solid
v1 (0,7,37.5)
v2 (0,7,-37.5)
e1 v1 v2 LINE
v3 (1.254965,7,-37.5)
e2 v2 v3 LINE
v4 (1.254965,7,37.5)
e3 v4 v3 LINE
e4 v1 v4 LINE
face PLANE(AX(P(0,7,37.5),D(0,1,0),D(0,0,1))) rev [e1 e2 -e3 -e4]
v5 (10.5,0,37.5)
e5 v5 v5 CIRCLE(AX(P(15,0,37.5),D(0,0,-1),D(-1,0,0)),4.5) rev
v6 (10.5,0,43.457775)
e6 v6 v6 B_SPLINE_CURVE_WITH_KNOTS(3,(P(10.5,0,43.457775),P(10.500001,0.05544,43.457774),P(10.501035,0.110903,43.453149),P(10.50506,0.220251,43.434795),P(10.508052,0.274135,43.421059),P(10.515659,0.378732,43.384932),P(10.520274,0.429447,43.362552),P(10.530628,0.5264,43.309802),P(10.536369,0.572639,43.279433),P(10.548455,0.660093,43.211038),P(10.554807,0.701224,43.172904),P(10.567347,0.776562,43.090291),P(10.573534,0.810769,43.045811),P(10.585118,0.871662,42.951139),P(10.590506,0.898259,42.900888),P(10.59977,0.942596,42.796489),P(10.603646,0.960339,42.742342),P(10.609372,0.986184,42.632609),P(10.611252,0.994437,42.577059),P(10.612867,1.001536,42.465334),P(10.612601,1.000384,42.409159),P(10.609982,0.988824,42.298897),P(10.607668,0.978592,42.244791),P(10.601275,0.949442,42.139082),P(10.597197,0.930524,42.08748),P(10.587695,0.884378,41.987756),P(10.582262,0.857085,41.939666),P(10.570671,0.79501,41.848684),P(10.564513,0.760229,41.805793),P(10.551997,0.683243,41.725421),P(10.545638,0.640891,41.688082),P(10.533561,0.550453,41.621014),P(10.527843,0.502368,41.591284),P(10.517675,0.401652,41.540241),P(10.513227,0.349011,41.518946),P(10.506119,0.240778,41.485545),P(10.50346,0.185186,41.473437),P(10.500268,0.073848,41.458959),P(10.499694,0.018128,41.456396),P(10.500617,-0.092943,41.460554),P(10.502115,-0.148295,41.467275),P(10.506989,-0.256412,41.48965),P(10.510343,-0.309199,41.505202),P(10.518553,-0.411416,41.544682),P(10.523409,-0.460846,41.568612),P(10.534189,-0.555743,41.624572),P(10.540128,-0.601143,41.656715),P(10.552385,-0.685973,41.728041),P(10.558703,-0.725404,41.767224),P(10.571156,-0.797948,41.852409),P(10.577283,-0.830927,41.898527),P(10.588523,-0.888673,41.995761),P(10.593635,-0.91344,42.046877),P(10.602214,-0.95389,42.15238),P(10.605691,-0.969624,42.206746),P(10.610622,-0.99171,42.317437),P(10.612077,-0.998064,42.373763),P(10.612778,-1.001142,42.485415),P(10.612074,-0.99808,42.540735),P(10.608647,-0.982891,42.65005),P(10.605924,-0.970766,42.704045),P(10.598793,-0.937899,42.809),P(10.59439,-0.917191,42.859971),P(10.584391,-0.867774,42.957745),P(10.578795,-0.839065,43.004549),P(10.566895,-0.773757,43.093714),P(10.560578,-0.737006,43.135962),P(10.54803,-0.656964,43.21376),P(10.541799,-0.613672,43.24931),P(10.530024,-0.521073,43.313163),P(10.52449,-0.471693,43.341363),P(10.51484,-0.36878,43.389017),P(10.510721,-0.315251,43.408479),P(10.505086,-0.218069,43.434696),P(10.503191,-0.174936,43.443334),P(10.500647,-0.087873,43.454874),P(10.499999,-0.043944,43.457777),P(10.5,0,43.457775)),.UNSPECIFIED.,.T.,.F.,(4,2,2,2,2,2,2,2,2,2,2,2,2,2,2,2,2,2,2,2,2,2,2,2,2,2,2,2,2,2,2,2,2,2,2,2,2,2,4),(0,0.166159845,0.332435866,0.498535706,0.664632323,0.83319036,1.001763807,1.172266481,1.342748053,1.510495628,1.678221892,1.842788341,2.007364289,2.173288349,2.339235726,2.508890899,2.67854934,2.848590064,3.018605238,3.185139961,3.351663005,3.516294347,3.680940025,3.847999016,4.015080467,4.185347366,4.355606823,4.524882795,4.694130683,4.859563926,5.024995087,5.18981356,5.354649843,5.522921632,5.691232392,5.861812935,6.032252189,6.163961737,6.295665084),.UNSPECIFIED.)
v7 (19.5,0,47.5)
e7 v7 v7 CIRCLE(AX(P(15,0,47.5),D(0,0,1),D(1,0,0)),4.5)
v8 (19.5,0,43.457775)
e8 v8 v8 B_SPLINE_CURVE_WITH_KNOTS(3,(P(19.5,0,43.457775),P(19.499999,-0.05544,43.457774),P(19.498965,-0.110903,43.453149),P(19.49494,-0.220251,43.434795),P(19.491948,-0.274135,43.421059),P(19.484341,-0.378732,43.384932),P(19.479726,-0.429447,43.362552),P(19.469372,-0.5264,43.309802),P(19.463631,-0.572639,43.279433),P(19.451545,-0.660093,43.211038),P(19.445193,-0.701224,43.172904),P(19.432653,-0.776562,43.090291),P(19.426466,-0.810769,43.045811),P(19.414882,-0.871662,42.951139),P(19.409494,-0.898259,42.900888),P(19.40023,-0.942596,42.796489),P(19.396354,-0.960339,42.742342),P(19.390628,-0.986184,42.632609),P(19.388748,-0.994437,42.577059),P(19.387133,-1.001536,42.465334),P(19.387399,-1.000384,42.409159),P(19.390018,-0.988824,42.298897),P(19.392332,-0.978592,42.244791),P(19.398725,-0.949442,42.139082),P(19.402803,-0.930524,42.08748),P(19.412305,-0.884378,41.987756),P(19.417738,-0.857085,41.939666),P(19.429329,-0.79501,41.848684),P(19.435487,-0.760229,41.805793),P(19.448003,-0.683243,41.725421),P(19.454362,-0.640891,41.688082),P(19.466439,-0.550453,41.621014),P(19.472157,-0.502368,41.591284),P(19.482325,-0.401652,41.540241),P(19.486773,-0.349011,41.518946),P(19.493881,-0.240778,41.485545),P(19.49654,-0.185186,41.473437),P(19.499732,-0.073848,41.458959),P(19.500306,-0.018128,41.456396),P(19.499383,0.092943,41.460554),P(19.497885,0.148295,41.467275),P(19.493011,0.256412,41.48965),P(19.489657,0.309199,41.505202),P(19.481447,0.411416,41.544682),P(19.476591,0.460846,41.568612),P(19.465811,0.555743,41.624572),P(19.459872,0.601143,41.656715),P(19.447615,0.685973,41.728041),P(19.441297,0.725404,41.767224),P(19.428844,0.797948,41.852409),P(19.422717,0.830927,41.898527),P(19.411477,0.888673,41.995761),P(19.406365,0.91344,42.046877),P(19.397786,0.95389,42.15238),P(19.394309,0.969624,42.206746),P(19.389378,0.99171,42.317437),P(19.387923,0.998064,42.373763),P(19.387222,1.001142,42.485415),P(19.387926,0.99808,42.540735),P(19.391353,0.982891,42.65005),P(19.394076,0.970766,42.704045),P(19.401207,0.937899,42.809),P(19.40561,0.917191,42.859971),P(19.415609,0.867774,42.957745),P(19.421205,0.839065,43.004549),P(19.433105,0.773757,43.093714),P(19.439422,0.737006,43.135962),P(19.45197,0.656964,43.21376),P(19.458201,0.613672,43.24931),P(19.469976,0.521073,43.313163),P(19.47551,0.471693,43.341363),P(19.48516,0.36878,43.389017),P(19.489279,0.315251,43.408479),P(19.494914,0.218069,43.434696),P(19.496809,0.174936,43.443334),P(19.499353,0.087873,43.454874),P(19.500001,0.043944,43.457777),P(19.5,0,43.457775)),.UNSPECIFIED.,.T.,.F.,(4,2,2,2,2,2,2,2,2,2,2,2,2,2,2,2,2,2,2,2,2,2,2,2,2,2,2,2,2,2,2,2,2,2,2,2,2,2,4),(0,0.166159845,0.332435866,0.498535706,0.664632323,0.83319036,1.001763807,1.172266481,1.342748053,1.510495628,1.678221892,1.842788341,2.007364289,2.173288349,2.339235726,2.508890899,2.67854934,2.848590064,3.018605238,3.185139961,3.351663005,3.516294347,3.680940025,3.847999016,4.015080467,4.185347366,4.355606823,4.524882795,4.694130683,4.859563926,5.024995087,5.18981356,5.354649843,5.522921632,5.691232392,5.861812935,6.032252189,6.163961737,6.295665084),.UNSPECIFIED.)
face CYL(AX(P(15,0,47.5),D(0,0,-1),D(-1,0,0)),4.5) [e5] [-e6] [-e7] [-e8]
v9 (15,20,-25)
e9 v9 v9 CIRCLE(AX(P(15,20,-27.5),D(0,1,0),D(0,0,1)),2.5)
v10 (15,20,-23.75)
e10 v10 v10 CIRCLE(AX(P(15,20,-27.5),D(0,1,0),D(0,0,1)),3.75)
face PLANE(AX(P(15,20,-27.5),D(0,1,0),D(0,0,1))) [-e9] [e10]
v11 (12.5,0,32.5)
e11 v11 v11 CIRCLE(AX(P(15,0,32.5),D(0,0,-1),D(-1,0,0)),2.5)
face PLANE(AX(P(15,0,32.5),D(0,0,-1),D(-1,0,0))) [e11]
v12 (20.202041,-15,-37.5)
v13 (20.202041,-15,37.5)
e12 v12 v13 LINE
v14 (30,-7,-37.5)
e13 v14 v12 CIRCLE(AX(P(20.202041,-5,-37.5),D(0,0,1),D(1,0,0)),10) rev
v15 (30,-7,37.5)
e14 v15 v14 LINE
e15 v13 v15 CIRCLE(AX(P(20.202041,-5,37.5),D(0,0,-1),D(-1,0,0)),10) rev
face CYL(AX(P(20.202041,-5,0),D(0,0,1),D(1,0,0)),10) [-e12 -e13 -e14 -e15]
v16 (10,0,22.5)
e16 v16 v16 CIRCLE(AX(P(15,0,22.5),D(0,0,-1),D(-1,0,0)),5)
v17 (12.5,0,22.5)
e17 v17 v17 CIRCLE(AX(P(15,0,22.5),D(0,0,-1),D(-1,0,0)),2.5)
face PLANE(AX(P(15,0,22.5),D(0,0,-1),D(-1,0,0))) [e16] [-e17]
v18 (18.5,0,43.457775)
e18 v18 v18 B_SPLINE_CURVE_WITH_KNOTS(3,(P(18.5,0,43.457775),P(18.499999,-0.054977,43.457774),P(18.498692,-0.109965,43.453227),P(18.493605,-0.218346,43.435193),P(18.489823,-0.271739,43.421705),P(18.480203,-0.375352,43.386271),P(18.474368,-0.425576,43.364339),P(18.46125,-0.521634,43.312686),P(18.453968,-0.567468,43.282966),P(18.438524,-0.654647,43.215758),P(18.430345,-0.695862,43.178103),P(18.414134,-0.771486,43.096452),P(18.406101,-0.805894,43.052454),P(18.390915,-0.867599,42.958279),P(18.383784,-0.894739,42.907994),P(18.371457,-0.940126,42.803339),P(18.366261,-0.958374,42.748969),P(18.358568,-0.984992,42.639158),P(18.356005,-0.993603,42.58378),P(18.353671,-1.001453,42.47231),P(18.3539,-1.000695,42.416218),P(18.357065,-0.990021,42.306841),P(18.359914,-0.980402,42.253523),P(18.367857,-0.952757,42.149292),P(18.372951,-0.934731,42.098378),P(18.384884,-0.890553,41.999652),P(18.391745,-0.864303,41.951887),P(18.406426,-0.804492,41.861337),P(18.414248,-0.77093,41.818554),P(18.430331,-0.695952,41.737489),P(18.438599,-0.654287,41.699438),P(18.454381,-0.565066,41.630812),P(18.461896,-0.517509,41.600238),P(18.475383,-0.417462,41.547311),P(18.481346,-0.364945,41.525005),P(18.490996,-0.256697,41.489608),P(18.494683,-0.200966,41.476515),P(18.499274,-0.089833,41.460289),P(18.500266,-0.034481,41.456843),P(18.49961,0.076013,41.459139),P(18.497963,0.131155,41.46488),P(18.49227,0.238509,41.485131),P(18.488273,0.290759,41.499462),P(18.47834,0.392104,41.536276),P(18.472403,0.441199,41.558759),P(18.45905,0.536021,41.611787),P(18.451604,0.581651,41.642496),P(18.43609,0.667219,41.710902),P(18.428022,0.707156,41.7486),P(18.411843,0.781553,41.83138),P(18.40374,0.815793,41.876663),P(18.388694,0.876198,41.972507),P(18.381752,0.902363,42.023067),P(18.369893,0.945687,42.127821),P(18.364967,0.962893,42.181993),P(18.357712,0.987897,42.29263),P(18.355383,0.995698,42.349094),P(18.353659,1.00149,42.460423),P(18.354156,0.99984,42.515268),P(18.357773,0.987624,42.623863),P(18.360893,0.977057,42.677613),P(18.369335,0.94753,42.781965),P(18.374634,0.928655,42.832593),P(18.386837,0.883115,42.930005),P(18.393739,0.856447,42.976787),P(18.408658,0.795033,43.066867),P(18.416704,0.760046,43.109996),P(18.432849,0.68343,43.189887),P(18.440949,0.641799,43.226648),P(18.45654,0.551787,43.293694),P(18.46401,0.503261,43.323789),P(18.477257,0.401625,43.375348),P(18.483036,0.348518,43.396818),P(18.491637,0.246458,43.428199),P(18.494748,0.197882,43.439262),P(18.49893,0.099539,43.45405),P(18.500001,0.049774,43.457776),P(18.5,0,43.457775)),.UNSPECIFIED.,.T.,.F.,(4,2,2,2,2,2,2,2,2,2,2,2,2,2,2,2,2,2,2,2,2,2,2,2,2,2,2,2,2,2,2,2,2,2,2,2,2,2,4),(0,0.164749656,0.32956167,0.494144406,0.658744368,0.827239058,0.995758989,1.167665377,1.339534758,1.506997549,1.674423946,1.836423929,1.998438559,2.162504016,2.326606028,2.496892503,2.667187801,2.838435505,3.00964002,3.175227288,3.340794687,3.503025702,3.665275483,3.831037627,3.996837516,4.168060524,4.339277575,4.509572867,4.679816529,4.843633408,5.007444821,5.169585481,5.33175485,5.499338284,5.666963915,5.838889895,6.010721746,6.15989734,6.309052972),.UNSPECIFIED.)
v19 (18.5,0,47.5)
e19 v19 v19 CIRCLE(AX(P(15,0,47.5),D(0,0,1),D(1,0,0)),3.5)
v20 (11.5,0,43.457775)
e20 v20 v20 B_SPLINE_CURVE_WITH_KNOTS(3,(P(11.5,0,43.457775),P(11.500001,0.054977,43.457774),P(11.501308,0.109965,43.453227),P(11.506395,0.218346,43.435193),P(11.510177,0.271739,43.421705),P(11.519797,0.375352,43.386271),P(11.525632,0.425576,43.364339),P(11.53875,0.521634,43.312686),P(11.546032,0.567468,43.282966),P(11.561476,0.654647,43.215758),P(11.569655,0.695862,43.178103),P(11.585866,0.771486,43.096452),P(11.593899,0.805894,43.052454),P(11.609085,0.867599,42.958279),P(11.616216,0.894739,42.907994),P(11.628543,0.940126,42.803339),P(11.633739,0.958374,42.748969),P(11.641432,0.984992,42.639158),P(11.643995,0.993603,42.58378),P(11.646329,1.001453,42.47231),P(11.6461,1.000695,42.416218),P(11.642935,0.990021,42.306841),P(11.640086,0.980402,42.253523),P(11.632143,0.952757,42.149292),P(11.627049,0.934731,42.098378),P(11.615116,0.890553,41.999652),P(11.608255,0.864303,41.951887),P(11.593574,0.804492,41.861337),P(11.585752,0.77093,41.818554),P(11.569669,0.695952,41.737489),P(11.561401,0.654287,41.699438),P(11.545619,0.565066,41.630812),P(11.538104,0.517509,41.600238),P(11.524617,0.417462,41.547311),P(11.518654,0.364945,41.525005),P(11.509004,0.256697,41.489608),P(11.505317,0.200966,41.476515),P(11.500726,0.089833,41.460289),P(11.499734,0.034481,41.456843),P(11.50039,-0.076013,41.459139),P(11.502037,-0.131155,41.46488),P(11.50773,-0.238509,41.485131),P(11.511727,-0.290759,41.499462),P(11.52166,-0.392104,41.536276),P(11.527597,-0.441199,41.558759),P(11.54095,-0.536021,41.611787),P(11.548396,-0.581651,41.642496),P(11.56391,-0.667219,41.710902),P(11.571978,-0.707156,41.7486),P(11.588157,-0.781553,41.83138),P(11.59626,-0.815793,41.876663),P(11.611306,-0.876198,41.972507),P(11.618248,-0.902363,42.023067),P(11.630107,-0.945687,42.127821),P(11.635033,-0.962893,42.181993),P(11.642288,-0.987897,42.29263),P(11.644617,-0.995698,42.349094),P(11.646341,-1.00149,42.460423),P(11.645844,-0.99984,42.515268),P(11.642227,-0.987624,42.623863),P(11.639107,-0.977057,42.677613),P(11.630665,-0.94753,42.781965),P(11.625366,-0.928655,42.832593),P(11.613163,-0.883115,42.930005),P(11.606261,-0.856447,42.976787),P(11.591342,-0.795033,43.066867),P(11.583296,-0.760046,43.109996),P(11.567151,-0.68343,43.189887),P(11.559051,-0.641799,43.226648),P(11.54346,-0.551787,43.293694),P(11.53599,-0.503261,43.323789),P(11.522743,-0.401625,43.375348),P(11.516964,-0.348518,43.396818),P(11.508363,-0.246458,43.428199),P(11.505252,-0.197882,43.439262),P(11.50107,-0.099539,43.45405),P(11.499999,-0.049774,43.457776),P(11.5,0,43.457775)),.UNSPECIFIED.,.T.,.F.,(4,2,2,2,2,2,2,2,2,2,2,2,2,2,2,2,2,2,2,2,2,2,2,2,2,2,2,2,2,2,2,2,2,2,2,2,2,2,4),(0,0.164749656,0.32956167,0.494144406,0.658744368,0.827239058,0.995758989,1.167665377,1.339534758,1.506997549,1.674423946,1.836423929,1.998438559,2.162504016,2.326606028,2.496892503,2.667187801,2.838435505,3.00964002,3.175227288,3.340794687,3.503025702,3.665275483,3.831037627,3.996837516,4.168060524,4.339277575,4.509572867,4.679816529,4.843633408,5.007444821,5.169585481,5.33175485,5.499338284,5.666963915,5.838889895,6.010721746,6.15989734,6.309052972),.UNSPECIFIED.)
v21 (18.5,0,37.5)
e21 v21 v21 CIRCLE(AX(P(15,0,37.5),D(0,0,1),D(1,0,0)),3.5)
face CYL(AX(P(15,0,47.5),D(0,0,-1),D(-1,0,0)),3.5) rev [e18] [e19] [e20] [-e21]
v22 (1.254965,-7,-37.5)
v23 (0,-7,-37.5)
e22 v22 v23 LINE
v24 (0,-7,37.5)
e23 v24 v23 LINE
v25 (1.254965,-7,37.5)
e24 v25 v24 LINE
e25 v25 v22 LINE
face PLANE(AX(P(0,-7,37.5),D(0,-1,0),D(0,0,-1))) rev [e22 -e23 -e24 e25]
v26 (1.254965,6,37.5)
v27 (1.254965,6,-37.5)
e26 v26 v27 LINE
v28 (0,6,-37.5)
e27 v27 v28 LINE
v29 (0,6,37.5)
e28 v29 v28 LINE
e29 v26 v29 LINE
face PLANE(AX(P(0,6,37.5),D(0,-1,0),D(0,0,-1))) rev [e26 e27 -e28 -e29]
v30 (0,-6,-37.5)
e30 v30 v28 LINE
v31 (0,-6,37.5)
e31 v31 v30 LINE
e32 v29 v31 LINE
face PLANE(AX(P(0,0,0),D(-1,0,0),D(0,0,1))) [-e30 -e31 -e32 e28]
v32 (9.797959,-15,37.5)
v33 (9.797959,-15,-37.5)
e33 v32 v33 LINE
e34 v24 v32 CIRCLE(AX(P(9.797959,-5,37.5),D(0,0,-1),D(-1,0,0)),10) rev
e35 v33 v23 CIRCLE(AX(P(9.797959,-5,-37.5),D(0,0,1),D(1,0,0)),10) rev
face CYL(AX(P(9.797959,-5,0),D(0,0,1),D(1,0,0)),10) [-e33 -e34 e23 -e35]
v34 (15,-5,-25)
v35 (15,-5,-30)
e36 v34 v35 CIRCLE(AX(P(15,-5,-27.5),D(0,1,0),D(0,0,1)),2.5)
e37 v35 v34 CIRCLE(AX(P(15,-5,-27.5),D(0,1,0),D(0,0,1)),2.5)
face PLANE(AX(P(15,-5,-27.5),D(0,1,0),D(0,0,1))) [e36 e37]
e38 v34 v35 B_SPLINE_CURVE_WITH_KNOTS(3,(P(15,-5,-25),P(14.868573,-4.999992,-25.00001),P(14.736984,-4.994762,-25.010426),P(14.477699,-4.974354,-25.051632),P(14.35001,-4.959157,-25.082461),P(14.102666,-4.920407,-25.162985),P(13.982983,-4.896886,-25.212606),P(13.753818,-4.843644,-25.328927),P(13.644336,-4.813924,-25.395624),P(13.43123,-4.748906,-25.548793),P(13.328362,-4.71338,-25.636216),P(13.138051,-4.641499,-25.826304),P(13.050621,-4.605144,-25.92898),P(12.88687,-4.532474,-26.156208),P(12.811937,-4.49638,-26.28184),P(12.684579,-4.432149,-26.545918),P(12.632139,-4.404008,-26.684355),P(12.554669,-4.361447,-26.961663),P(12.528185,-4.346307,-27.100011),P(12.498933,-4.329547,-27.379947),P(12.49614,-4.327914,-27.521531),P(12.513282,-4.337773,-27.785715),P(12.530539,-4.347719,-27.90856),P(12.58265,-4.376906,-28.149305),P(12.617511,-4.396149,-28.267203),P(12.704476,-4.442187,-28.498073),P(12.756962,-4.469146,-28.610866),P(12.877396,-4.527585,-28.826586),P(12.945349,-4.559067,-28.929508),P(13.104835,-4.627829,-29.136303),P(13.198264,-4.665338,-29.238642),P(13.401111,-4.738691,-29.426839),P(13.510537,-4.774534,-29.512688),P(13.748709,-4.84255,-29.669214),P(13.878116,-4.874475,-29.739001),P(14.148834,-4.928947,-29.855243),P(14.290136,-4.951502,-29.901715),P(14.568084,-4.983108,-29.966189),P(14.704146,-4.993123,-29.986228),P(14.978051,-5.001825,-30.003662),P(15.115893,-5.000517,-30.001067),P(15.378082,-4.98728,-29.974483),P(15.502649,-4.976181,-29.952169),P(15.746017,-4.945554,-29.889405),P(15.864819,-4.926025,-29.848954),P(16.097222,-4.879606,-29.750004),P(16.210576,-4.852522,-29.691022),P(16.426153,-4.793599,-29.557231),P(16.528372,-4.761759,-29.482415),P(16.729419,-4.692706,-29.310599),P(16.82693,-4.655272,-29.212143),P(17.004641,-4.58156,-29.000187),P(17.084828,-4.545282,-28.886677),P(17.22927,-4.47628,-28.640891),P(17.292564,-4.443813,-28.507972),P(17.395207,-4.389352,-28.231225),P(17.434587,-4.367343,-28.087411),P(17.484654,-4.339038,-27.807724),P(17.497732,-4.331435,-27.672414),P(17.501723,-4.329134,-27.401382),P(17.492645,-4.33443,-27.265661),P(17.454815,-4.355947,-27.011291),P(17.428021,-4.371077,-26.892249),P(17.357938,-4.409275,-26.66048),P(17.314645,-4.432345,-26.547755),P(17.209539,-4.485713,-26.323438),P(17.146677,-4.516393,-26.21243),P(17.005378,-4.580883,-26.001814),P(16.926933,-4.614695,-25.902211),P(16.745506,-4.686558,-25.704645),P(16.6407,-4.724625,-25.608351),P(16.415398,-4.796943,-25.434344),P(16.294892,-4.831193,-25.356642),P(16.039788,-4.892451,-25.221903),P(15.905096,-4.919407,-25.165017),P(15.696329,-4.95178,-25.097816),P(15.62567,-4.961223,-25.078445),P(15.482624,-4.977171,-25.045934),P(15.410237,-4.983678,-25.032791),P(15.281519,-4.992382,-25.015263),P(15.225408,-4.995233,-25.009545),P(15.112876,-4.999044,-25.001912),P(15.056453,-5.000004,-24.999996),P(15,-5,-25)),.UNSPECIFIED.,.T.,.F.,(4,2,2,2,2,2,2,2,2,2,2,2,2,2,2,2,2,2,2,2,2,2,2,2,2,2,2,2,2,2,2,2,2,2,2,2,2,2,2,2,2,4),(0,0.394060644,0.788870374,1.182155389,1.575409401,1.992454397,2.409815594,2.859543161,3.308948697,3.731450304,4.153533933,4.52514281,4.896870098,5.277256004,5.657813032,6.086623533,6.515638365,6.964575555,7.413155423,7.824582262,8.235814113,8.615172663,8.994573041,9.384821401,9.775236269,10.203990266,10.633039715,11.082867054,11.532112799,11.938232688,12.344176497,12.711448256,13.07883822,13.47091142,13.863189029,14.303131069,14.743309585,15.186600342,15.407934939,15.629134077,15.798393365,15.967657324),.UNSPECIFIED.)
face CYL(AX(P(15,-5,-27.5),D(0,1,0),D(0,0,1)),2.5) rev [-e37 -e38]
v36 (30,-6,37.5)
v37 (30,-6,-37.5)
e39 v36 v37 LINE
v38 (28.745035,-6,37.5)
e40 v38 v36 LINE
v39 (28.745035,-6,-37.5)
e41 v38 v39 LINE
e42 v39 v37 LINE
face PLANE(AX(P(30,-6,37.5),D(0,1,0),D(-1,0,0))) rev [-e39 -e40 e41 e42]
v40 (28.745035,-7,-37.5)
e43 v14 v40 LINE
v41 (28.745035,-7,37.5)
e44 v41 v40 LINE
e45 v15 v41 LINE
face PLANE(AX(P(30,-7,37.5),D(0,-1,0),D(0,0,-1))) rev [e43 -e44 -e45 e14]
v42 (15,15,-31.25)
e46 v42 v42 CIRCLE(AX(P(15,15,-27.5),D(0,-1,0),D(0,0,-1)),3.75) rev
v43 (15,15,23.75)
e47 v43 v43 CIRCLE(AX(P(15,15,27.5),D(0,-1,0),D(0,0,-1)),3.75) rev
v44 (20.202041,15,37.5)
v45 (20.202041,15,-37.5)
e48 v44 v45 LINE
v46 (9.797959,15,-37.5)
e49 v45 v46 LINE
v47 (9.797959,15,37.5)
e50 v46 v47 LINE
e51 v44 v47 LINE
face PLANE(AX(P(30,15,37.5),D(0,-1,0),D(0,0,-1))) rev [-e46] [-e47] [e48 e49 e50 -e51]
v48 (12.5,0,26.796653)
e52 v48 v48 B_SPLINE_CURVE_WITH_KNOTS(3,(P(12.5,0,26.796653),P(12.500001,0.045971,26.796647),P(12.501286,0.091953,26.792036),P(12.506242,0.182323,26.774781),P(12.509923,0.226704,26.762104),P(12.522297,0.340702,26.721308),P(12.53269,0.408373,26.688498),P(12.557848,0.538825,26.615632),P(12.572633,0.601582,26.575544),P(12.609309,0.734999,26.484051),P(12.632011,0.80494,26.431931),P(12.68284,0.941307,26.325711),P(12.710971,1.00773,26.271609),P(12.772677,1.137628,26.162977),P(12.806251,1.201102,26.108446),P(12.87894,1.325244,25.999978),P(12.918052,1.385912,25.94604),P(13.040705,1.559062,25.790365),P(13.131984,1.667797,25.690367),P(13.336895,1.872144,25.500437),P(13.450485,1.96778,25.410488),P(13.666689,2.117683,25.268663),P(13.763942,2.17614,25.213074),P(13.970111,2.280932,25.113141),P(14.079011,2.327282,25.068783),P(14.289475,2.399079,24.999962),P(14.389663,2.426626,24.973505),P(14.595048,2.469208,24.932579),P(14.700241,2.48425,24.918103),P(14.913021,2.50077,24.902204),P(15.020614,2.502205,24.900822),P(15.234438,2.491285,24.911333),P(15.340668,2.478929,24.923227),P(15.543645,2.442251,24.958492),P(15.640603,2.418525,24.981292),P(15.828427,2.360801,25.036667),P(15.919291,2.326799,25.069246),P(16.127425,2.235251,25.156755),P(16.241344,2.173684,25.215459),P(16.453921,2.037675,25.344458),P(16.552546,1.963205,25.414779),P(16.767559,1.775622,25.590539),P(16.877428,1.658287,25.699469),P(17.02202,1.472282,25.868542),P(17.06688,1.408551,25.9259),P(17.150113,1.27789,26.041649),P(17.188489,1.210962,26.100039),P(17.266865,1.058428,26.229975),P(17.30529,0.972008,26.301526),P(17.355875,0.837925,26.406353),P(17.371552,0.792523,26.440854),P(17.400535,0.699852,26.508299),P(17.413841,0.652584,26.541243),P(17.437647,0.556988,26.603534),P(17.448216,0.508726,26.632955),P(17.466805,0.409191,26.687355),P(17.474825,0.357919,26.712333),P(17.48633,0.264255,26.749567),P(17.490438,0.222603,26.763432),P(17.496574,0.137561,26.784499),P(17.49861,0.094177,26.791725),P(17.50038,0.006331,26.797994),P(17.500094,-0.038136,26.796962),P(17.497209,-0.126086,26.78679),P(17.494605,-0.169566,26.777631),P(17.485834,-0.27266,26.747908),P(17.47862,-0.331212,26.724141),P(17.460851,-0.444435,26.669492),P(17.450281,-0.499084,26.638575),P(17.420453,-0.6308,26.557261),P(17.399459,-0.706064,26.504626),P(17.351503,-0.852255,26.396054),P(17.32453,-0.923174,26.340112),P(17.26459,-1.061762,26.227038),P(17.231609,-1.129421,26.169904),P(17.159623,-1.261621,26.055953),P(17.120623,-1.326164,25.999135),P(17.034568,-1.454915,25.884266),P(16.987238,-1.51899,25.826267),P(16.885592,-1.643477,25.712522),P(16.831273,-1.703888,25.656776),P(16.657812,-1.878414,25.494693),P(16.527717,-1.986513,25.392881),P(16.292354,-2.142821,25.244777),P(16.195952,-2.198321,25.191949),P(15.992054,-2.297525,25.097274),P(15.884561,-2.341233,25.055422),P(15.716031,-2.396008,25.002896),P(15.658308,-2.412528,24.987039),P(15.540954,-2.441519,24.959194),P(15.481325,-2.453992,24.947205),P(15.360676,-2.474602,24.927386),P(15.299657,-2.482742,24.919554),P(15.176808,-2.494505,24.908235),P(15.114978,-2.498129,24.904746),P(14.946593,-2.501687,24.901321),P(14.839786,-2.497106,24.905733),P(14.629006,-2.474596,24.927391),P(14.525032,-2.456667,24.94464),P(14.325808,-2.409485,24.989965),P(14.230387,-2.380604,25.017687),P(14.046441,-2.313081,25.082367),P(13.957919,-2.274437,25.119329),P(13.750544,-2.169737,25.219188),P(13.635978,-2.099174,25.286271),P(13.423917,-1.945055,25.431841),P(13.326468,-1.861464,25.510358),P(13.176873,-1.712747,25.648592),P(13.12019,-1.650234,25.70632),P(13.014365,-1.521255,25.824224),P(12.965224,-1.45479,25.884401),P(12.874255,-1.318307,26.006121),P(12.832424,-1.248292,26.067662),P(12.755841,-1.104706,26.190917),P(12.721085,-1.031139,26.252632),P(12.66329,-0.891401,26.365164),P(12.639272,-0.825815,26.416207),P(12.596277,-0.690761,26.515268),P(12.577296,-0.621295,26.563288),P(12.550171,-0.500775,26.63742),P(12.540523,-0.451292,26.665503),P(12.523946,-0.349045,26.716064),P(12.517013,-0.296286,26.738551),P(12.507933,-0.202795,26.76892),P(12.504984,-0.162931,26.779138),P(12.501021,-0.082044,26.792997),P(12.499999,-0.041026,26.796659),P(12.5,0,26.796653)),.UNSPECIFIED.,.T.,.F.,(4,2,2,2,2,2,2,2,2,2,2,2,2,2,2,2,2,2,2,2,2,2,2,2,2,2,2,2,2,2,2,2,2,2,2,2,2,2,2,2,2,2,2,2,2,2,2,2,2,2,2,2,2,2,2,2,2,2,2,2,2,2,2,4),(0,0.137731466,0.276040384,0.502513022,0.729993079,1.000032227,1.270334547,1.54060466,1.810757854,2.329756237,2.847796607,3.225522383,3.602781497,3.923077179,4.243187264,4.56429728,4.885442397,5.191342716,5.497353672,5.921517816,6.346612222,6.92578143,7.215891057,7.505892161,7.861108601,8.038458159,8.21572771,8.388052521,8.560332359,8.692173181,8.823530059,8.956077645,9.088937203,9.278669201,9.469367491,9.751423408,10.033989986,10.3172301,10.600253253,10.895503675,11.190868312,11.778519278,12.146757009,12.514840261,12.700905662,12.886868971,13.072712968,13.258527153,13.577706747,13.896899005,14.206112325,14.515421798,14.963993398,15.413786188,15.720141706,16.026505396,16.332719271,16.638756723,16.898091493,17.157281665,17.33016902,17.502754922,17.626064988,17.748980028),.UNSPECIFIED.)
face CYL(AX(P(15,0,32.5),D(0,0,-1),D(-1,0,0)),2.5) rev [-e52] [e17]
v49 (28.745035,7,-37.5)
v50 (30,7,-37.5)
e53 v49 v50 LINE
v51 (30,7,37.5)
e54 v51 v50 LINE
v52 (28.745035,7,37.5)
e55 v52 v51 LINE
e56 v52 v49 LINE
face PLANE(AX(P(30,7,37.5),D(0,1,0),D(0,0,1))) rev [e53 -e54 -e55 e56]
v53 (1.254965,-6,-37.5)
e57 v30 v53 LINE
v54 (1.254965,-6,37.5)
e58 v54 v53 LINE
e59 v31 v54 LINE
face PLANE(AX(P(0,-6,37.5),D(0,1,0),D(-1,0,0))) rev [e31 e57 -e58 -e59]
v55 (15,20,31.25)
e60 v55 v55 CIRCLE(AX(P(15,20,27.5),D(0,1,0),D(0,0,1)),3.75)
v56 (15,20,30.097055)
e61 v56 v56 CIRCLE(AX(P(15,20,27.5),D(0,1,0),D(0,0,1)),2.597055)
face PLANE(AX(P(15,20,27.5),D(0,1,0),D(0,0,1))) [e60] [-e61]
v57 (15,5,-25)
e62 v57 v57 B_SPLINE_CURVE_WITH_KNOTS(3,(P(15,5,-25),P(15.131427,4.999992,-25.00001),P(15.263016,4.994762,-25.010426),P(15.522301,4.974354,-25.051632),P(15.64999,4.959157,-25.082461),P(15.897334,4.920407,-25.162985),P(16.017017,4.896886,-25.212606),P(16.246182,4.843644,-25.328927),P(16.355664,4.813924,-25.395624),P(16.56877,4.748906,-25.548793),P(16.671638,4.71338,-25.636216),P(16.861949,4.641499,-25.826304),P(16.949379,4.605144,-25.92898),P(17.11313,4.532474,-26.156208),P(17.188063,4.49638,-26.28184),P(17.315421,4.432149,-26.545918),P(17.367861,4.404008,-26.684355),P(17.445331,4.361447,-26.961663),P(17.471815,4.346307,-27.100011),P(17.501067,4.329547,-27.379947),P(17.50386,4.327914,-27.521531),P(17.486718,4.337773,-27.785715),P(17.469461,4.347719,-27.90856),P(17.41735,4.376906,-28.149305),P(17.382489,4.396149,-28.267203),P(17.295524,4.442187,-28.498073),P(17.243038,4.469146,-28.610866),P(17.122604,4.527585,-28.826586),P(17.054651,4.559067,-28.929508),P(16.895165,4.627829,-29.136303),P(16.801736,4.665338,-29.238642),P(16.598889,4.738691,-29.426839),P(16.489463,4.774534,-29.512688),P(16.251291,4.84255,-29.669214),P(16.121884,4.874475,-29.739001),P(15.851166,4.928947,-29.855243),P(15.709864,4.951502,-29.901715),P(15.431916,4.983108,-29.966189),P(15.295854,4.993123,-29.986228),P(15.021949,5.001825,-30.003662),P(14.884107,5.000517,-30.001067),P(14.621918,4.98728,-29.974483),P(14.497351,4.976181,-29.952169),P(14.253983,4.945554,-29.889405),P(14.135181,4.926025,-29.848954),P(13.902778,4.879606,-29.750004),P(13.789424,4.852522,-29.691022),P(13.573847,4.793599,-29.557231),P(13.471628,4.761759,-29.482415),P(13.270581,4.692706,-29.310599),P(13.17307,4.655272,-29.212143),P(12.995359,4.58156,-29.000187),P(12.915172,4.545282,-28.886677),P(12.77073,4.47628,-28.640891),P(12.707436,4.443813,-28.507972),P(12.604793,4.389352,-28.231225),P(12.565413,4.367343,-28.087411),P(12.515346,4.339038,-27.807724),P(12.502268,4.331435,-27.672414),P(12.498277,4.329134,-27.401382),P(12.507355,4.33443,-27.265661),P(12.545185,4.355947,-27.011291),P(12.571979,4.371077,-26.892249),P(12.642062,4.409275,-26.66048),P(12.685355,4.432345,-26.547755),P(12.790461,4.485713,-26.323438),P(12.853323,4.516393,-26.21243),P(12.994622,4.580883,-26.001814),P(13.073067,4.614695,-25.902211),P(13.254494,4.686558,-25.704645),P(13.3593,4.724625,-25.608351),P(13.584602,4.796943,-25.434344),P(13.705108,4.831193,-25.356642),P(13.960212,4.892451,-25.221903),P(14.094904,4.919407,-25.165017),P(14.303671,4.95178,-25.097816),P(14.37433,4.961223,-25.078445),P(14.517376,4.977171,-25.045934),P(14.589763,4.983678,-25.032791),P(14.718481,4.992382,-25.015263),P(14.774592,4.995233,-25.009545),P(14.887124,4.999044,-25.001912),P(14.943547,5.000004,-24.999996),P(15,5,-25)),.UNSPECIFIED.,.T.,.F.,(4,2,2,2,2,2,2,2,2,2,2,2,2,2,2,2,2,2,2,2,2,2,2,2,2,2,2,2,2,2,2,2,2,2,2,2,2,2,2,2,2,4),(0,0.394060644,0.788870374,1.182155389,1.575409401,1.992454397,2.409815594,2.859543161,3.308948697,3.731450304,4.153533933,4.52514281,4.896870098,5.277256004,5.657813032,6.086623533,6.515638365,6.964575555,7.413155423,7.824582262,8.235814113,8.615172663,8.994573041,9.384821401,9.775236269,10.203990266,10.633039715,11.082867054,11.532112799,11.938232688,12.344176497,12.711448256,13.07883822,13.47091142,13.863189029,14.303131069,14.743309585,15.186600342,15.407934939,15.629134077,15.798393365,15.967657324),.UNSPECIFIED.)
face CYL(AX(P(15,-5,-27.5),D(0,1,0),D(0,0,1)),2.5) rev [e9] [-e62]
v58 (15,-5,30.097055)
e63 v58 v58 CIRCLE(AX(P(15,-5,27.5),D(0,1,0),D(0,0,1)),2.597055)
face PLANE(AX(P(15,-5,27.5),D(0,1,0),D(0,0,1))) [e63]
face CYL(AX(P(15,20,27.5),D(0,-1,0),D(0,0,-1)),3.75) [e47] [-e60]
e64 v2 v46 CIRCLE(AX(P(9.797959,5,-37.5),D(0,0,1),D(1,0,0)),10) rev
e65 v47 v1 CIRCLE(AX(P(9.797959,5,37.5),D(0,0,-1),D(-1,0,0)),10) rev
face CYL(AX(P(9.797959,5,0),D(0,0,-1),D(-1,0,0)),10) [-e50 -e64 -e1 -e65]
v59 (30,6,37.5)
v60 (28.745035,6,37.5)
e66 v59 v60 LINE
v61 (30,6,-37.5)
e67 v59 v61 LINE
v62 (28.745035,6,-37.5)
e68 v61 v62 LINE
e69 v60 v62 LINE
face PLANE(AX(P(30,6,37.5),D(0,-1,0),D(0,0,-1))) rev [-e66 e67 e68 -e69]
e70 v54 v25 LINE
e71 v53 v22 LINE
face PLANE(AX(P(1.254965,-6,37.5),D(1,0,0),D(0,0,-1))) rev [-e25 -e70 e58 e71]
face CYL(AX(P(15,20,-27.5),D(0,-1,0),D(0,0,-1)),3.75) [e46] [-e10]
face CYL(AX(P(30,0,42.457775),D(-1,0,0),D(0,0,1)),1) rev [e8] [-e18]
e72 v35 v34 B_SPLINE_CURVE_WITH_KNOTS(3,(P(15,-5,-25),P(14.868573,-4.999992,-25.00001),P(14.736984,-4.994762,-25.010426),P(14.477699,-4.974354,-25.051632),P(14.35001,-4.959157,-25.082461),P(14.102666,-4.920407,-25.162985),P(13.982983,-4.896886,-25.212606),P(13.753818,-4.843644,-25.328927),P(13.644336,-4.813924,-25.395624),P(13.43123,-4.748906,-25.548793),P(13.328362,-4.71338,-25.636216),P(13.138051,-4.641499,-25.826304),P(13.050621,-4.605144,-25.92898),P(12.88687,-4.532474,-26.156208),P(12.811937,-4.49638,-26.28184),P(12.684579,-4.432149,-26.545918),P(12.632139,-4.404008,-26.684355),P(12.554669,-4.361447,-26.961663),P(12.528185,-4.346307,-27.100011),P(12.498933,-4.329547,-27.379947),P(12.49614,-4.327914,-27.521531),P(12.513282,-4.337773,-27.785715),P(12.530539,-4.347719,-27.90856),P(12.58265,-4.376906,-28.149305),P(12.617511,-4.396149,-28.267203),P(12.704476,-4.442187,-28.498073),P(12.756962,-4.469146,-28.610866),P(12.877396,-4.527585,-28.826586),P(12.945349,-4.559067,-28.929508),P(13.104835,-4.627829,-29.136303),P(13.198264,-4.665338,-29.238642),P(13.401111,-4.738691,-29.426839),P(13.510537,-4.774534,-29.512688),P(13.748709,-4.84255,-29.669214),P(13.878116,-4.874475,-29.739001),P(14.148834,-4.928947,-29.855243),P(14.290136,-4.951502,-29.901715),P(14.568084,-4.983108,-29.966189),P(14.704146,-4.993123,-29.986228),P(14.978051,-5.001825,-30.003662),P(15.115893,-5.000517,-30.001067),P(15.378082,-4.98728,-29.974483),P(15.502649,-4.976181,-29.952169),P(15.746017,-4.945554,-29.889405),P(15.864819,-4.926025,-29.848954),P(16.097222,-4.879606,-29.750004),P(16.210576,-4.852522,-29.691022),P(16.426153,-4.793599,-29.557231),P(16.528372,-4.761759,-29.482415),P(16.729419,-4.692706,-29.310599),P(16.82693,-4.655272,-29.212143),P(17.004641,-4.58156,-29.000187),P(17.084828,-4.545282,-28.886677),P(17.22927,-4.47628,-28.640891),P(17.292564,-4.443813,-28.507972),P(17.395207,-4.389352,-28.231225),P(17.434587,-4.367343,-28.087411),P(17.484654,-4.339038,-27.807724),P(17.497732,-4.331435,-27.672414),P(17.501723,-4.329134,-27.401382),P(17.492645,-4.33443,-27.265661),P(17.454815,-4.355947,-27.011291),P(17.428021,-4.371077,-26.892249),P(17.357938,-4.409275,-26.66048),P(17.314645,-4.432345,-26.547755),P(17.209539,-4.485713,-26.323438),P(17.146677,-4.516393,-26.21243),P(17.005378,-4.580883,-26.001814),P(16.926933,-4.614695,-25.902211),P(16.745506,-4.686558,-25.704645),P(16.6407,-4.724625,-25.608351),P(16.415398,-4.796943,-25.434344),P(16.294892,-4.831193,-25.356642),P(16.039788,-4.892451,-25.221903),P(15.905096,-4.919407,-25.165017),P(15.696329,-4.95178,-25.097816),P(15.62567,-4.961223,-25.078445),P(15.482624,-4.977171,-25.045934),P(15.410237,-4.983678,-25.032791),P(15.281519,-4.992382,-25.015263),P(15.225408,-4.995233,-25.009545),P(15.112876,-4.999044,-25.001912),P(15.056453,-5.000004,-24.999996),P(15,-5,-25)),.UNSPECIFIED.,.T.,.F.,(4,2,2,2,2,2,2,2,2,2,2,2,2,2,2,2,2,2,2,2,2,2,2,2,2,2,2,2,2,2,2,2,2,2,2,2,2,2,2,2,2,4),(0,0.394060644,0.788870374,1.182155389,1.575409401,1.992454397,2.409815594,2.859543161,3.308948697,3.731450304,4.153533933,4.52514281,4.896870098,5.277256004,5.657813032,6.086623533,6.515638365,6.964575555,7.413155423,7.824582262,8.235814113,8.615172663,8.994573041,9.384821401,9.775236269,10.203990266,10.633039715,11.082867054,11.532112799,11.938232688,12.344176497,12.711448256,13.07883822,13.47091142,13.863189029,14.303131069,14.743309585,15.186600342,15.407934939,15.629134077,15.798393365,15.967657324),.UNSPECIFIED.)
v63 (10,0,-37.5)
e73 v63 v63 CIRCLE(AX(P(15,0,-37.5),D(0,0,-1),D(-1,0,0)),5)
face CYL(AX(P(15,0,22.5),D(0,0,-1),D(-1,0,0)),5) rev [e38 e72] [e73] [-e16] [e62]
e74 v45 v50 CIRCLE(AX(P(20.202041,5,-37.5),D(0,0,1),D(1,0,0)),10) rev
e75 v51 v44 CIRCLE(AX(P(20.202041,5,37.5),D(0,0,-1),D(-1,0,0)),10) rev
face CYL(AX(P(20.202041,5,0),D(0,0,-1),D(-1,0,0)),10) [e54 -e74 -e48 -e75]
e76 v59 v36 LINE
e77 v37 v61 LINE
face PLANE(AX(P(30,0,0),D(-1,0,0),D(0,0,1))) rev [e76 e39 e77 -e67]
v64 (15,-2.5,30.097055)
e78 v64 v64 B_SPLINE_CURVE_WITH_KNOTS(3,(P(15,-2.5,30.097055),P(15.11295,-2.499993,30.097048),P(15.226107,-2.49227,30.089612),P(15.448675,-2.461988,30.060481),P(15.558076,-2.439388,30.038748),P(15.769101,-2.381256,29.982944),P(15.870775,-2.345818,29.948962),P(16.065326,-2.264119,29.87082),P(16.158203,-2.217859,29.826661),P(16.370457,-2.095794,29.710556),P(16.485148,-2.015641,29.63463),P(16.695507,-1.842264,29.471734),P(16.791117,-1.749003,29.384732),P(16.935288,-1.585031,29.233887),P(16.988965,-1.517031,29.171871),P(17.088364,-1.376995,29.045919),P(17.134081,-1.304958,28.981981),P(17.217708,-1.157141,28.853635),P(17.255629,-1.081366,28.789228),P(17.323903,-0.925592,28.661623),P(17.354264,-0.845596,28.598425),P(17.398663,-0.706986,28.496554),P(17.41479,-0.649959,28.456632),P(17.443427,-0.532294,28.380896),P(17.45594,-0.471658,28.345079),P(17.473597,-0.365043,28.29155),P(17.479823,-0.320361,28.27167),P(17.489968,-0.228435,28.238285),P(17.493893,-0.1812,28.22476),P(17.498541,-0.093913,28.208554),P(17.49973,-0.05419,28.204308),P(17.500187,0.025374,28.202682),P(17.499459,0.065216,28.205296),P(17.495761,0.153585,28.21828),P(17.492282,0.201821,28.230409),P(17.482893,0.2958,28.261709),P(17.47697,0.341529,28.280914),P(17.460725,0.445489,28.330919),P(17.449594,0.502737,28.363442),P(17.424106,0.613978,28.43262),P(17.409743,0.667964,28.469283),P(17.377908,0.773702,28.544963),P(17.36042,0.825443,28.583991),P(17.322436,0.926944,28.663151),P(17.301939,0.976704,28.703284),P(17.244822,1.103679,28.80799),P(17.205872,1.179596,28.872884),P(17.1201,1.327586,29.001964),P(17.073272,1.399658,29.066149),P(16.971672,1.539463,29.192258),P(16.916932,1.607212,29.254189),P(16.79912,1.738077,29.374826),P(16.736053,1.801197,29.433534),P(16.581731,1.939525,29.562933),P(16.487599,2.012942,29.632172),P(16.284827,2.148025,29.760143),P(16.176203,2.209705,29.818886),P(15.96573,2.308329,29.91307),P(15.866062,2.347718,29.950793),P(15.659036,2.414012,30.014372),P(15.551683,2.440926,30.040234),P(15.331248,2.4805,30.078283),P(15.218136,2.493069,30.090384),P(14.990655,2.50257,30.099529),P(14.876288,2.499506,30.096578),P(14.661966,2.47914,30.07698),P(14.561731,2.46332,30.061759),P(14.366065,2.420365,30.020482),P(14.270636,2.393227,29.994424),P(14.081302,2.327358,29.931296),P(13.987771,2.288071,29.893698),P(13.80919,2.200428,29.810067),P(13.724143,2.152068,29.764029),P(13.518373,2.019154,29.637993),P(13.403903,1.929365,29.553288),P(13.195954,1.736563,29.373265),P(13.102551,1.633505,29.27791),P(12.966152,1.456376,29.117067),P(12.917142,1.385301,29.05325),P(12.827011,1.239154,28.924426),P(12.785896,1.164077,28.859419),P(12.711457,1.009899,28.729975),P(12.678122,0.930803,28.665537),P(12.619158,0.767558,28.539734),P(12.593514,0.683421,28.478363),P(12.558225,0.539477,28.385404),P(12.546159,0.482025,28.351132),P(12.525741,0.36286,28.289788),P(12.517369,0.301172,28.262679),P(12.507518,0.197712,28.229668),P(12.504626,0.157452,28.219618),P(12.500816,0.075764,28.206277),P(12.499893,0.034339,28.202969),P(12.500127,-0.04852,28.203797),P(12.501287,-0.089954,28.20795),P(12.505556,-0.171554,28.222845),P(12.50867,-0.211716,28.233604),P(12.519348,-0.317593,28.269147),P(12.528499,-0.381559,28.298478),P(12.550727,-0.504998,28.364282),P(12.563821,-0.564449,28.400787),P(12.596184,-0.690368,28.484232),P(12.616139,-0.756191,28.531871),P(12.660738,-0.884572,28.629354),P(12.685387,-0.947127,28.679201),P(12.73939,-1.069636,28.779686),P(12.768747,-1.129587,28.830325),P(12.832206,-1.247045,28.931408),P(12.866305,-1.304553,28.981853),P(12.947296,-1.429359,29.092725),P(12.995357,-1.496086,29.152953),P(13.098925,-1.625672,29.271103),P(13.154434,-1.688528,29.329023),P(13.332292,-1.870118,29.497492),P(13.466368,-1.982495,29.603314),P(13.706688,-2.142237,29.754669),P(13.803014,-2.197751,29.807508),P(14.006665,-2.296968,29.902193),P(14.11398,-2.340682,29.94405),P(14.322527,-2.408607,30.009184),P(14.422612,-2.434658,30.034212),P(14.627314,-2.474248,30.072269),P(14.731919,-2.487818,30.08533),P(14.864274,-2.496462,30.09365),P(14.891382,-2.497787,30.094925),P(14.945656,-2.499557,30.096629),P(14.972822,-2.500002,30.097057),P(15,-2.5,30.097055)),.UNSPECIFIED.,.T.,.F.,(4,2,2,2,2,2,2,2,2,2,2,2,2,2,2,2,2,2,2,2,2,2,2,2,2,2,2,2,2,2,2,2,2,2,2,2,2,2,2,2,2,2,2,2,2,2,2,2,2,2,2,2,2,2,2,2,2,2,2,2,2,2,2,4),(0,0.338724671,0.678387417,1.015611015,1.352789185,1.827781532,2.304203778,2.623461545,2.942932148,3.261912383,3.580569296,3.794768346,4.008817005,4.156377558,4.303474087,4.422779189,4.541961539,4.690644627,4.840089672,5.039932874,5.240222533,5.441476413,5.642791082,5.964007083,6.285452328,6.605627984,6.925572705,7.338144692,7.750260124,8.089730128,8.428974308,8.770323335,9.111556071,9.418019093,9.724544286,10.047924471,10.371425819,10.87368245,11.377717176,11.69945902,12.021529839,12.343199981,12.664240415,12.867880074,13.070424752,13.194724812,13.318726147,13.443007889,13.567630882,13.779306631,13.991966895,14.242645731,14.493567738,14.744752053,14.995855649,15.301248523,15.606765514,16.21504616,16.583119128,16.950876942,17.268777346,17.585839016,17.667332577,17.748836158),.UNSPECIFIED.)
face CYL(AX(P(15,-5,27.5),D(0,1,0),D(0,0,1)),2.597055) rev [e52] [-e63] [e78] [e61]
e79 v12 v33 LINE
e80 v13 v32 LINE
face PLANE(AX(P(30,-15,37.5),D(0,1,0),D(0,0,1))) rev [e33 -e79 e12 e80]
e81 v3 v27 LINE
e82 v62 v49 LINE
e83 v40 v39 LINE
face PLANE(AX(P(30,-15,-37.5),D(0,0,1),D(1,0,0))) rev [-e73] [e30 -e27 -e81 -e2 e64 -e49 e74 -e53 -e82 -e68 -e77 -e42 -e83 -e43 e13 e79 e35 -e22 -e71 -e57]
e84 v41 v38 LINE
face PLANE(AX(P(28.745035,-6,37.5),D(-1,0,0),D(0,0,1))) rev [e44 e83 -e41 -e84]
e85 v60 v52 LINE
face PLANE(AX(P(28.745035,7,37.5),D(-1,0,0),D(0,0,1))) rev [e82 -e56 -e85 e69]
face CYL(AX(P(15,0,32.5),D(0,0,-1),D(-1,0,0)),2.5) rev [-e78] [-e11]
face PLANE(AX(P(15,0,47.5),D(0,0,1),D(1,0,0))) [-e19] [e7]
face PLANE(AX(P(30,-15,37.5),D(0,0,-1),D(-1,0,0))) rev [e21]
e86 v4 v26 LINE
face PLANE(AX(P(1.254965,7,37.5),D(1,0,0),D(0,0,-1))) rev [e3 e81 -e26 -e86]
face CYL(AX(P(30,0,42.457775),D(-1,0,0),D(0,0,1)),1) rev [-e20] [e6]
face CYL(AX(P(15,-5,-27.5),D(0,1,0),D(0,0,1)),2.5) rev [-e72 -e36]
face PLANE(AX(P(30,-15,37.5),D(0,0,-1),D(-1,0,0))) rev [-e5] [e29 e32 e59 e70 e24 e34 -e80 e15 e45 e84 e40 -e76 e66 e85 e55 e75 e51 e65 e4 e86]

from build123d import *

# Parameters (mm, degrees)
SKETCH1_W           = 75
SKETCH1_H           = 30
BOSS_EXTRUDE1_DEPTH = 30
SKETCH3_R           = 5
CUT_EXTRUDE1_DEPTH  = 60
SKETCH4_W           = 1.254965376
SKETCH4_H           = 1
CUT_EXTRUDE2_DEPTH  = 83.158383626
SKETCH5_R           = 2.5
SKETCH5_R_2         = 2.597055459
CUT_EXTRUDE3_DEPTH  = 20
BOSS_EXTRUDE2_START = 5
SKETCH6_R           = 3.75
SKETCH6_R_2         = 2.597055459
SKETCH6_R_3         = 2.5
BOSS_EXTRUDE2_DEPTH = 5
SKETCH7_R           = 2.5
CUT_EXTRUDE4_DEPTH  = 10
SKETCH8_R           = 4.5
SKETCH8_R_2         = 3.5
BOSS_EXTRUDE3_DEPTH = 10
SKETCH9_R           = 1
CUT_EXTRUDE5_DEPTH  = 60.634302243
FILLET1_R           = 10


with BuildPart() as part:
    # Sketch1 → Boss-Extrude1 (new body)
    with BuildSketch(Plane(origin=(0, 0, 0), x_dir=(0, 0, -1), z_dir=(1, 0, 0))):
        Rectangle(SKETCH1_W, SKETCH1_H)
    extrude(amount=BOSS_EXTRUDE1_DEPTH)

    # Sketch3 → Cut-Extrude1 (cut)
    with BuildSketch(Plane(origin=(0, 0, -37.5), x_dir=(-1, 0, 0), z_dir=(0, 0, -1))):
        with Locations((-15, 0)):
            Circle(SKETCH3_R)
    extrude(amount=-CUT_EXTRUDE1_DEPTH, mode=Mode.SUBTRACT)

    # Sketch4 → Cut-Extrude2 (cut, through all)
    with BuildSketch(Plane(origin=(0, 0, -37.5), x_dir=(-1, 0, 0), z_dir=(0, 0, -1))):
        with Locations((-29.372517312, 6.5)):
            Rectangle(SKETCH4_W, SKETCH4_H)
        with Locations((-29.372517312, -6.5)):
            Rectangle(SKETCH4_W, SKETCH4_H)
        with Locations((-0.627482688, -6.5)):
            Rectangle(SKETCH4_W, SKETCH4_H)
        with Locations((-0.627482688, 6.5)):
            Rectangle(SKETCH4_W, SKETCH4_H)
    extrude(amount=-CUT_EXTRUDE2_DEPTH, mode=Mode.SUBTRACT)

    # Sketch5 → Cut-Extrude3 (cut)
    with BuildSketch(Plane(origin=(0, 15, 0), x_dir=(1, 0, 0), z_dir=(0, 1, 0))):
        with Locations(Location((15, 27.5, 0), (0, 0, 270))):
            Circle(SKETCH5_R)
        with Locations(Location((15, -27.5, 0), (0, 0, 270))):
            Circle(SKETCH5_R_2)
    extrude(amount=-CUT_EXTRUDE3_DEPTH, mode=Mode.SUBTRACT)

    # Sketch6 → Boss-Extrude2 (add)
    # profile 1 of 2: a face of its own
    with BuildSketch(Plane(origin=(0, 15, 0), x_dir=(1, 0, 0), z_dir=(0, 1, 0)).offset(BOSS_EXTRUDE2_START)):
        with Locations(Location((15, -27.5, 0), (0, 0, 90))):
            Circle(SKETCH6_R)
        with Locations(Location((15, -27.5, 0), (0, 0, 270))):
            Circle(SKETCH6_R_2, mode=Mode.SUBTRACT)
    # profile 2 of 2: a face of its own
    with BuildSketch(Plane(origin=(0, 15, 0), x_dir=(1, 0, 0), z_dir=(0, 1, 0)).offset(BOSS_EXTRUDE2_START)):
        with Locations(Location((15, 27.5, 0), (0, 0, 90))):
            Circle(SKETCH6_R)
        with Locations(Location((15, 27.5, 0), (0, 0, 270))):
            Circle(SKETCH6_R_3, mode=Mode.SUBTRACT)
    extrude(amount=-BOSS_EXTRUDE2_DEPTH)

    # Sketch7 → Cut-Extrude4 (cut)
    with BuildSketch(Plane(origin=(0, 0, 22.5), x_dir=(-1, 0, 0), z_dir=(0, 0, -1))):
        with Locations((-15, 0)):
            Circle(SKETCH7_R)
    extrude(amount=-CUT_EXTRUDE4_DEPTH, mode=Mode.SUBTRACT)

    # Sketch8 → Boss-Extrude3 (add)
    with BuildSketch(Plane.XY.offset(37.5)):
        with Locations(Location((15, 0, 0), (0, 0, 180))):
            Circle(SKETCH8_R)
        with Locations((15, 0)):
            Circle(SKETCH8_R_2, mode=Mode.SUBTRACT)
    extrude(amount=BOSS_EXTRUDE3_DEPTH)

    # Sketch9 → Cut-Extrude5 (cut, through all)
    with BuildSketch(Plane(origin=(0, 0, 0), x_dir=(0, 0, -1), z_dir=(1, 0, 0))):
        with Locations(Location((-42.457775401, 0, 0), (0, 0, 180))):
            Circle(SKETCH9_R)
    extrude(amount=CUT_EXTRUDE5_DEPTH, mode=Mode.SUBTRACT)

    # Fillet1
    # the kernel refuses this fillet: 10 mm, written as the material it takes off along each edge
    with BuildSketch(Plane(origin=(30, -15, 61.994897428), x_dir=(-1, 0, 0), z_dir=(0, 0, -1)), Plane(origin=(30, 15, -61.994897428), x_dir=(-1, 0, 0), z_dir=(0, 0, 1))) as fillet1_piece_1:
        with BuildLine():
            CenterArc((9.797958971, 10), FILLET1_R, 191.536959033, 78.463040967)
            Line((0, 8), (-0.195959179, 7.96))
            ThreePointArc((-0.195959179, 7.96), (-0.2, 4), (-0.2, 0))
            Line((-0.2, 0), (0, -0.2))
            Line((0, -0.2), (9.797958971, -0.2))
            Line((9.797958971, -0.2), (9.797958971, 0))
        make_face()
    extrude(amount=123.989794856, mode=Mode.SUBTRACT)
    with BuildSketch(Plane(origin=(0, -15, 61.994897428), x_dir=(1, 0, 0), z_dir=(0, 0, -1))) as fillet1_piece_2:
        with BuildLine():
            CenterArc((9.797958971, -10), FILLET1_R, 90, 78.463040967)
            Line((0, -8), (-0.195959179, -7.96))
            ThreePointArc((-0.195959179, -7.96), (-0.2, -4), (-0.2, 0))
            Line((-0.2, 0), (0, 0.2))
            Line((0, 0.2), (9.797958971, 0.2))
            Line((9.797958971, 0.2), (9.797958971, 0))
        make_face()
    extrude(amount=123.989794856, mode=Mode.SUBTRACT)
    with BuildSketch(Plane(origin=(0, 15, -61.994897428), x_dir=(0, -1, 0), z_dir=(0, 0, 1))) as fillet1_piece_3:
        with BuildLine():
            CenterArc((10, 9.797958971), FILLET1_R, 180, 78.463040967)
            Line((0, 9.797958971), (-0.2, 9.797958971))
            Line((-0.2, 9.797958971), (-0.2, 0))
            Line((-0.2, 0), (0, -0.2))
            ThreePointArc((0, -0.2), (4, -0.2), (7.96, -0.195959179))
            Line((7.96, -0.195959179), (8, 0))
        make_face()
    extrude(amount=123.989794856, mode=Mode.SUBTRACT)


solid = part.part
